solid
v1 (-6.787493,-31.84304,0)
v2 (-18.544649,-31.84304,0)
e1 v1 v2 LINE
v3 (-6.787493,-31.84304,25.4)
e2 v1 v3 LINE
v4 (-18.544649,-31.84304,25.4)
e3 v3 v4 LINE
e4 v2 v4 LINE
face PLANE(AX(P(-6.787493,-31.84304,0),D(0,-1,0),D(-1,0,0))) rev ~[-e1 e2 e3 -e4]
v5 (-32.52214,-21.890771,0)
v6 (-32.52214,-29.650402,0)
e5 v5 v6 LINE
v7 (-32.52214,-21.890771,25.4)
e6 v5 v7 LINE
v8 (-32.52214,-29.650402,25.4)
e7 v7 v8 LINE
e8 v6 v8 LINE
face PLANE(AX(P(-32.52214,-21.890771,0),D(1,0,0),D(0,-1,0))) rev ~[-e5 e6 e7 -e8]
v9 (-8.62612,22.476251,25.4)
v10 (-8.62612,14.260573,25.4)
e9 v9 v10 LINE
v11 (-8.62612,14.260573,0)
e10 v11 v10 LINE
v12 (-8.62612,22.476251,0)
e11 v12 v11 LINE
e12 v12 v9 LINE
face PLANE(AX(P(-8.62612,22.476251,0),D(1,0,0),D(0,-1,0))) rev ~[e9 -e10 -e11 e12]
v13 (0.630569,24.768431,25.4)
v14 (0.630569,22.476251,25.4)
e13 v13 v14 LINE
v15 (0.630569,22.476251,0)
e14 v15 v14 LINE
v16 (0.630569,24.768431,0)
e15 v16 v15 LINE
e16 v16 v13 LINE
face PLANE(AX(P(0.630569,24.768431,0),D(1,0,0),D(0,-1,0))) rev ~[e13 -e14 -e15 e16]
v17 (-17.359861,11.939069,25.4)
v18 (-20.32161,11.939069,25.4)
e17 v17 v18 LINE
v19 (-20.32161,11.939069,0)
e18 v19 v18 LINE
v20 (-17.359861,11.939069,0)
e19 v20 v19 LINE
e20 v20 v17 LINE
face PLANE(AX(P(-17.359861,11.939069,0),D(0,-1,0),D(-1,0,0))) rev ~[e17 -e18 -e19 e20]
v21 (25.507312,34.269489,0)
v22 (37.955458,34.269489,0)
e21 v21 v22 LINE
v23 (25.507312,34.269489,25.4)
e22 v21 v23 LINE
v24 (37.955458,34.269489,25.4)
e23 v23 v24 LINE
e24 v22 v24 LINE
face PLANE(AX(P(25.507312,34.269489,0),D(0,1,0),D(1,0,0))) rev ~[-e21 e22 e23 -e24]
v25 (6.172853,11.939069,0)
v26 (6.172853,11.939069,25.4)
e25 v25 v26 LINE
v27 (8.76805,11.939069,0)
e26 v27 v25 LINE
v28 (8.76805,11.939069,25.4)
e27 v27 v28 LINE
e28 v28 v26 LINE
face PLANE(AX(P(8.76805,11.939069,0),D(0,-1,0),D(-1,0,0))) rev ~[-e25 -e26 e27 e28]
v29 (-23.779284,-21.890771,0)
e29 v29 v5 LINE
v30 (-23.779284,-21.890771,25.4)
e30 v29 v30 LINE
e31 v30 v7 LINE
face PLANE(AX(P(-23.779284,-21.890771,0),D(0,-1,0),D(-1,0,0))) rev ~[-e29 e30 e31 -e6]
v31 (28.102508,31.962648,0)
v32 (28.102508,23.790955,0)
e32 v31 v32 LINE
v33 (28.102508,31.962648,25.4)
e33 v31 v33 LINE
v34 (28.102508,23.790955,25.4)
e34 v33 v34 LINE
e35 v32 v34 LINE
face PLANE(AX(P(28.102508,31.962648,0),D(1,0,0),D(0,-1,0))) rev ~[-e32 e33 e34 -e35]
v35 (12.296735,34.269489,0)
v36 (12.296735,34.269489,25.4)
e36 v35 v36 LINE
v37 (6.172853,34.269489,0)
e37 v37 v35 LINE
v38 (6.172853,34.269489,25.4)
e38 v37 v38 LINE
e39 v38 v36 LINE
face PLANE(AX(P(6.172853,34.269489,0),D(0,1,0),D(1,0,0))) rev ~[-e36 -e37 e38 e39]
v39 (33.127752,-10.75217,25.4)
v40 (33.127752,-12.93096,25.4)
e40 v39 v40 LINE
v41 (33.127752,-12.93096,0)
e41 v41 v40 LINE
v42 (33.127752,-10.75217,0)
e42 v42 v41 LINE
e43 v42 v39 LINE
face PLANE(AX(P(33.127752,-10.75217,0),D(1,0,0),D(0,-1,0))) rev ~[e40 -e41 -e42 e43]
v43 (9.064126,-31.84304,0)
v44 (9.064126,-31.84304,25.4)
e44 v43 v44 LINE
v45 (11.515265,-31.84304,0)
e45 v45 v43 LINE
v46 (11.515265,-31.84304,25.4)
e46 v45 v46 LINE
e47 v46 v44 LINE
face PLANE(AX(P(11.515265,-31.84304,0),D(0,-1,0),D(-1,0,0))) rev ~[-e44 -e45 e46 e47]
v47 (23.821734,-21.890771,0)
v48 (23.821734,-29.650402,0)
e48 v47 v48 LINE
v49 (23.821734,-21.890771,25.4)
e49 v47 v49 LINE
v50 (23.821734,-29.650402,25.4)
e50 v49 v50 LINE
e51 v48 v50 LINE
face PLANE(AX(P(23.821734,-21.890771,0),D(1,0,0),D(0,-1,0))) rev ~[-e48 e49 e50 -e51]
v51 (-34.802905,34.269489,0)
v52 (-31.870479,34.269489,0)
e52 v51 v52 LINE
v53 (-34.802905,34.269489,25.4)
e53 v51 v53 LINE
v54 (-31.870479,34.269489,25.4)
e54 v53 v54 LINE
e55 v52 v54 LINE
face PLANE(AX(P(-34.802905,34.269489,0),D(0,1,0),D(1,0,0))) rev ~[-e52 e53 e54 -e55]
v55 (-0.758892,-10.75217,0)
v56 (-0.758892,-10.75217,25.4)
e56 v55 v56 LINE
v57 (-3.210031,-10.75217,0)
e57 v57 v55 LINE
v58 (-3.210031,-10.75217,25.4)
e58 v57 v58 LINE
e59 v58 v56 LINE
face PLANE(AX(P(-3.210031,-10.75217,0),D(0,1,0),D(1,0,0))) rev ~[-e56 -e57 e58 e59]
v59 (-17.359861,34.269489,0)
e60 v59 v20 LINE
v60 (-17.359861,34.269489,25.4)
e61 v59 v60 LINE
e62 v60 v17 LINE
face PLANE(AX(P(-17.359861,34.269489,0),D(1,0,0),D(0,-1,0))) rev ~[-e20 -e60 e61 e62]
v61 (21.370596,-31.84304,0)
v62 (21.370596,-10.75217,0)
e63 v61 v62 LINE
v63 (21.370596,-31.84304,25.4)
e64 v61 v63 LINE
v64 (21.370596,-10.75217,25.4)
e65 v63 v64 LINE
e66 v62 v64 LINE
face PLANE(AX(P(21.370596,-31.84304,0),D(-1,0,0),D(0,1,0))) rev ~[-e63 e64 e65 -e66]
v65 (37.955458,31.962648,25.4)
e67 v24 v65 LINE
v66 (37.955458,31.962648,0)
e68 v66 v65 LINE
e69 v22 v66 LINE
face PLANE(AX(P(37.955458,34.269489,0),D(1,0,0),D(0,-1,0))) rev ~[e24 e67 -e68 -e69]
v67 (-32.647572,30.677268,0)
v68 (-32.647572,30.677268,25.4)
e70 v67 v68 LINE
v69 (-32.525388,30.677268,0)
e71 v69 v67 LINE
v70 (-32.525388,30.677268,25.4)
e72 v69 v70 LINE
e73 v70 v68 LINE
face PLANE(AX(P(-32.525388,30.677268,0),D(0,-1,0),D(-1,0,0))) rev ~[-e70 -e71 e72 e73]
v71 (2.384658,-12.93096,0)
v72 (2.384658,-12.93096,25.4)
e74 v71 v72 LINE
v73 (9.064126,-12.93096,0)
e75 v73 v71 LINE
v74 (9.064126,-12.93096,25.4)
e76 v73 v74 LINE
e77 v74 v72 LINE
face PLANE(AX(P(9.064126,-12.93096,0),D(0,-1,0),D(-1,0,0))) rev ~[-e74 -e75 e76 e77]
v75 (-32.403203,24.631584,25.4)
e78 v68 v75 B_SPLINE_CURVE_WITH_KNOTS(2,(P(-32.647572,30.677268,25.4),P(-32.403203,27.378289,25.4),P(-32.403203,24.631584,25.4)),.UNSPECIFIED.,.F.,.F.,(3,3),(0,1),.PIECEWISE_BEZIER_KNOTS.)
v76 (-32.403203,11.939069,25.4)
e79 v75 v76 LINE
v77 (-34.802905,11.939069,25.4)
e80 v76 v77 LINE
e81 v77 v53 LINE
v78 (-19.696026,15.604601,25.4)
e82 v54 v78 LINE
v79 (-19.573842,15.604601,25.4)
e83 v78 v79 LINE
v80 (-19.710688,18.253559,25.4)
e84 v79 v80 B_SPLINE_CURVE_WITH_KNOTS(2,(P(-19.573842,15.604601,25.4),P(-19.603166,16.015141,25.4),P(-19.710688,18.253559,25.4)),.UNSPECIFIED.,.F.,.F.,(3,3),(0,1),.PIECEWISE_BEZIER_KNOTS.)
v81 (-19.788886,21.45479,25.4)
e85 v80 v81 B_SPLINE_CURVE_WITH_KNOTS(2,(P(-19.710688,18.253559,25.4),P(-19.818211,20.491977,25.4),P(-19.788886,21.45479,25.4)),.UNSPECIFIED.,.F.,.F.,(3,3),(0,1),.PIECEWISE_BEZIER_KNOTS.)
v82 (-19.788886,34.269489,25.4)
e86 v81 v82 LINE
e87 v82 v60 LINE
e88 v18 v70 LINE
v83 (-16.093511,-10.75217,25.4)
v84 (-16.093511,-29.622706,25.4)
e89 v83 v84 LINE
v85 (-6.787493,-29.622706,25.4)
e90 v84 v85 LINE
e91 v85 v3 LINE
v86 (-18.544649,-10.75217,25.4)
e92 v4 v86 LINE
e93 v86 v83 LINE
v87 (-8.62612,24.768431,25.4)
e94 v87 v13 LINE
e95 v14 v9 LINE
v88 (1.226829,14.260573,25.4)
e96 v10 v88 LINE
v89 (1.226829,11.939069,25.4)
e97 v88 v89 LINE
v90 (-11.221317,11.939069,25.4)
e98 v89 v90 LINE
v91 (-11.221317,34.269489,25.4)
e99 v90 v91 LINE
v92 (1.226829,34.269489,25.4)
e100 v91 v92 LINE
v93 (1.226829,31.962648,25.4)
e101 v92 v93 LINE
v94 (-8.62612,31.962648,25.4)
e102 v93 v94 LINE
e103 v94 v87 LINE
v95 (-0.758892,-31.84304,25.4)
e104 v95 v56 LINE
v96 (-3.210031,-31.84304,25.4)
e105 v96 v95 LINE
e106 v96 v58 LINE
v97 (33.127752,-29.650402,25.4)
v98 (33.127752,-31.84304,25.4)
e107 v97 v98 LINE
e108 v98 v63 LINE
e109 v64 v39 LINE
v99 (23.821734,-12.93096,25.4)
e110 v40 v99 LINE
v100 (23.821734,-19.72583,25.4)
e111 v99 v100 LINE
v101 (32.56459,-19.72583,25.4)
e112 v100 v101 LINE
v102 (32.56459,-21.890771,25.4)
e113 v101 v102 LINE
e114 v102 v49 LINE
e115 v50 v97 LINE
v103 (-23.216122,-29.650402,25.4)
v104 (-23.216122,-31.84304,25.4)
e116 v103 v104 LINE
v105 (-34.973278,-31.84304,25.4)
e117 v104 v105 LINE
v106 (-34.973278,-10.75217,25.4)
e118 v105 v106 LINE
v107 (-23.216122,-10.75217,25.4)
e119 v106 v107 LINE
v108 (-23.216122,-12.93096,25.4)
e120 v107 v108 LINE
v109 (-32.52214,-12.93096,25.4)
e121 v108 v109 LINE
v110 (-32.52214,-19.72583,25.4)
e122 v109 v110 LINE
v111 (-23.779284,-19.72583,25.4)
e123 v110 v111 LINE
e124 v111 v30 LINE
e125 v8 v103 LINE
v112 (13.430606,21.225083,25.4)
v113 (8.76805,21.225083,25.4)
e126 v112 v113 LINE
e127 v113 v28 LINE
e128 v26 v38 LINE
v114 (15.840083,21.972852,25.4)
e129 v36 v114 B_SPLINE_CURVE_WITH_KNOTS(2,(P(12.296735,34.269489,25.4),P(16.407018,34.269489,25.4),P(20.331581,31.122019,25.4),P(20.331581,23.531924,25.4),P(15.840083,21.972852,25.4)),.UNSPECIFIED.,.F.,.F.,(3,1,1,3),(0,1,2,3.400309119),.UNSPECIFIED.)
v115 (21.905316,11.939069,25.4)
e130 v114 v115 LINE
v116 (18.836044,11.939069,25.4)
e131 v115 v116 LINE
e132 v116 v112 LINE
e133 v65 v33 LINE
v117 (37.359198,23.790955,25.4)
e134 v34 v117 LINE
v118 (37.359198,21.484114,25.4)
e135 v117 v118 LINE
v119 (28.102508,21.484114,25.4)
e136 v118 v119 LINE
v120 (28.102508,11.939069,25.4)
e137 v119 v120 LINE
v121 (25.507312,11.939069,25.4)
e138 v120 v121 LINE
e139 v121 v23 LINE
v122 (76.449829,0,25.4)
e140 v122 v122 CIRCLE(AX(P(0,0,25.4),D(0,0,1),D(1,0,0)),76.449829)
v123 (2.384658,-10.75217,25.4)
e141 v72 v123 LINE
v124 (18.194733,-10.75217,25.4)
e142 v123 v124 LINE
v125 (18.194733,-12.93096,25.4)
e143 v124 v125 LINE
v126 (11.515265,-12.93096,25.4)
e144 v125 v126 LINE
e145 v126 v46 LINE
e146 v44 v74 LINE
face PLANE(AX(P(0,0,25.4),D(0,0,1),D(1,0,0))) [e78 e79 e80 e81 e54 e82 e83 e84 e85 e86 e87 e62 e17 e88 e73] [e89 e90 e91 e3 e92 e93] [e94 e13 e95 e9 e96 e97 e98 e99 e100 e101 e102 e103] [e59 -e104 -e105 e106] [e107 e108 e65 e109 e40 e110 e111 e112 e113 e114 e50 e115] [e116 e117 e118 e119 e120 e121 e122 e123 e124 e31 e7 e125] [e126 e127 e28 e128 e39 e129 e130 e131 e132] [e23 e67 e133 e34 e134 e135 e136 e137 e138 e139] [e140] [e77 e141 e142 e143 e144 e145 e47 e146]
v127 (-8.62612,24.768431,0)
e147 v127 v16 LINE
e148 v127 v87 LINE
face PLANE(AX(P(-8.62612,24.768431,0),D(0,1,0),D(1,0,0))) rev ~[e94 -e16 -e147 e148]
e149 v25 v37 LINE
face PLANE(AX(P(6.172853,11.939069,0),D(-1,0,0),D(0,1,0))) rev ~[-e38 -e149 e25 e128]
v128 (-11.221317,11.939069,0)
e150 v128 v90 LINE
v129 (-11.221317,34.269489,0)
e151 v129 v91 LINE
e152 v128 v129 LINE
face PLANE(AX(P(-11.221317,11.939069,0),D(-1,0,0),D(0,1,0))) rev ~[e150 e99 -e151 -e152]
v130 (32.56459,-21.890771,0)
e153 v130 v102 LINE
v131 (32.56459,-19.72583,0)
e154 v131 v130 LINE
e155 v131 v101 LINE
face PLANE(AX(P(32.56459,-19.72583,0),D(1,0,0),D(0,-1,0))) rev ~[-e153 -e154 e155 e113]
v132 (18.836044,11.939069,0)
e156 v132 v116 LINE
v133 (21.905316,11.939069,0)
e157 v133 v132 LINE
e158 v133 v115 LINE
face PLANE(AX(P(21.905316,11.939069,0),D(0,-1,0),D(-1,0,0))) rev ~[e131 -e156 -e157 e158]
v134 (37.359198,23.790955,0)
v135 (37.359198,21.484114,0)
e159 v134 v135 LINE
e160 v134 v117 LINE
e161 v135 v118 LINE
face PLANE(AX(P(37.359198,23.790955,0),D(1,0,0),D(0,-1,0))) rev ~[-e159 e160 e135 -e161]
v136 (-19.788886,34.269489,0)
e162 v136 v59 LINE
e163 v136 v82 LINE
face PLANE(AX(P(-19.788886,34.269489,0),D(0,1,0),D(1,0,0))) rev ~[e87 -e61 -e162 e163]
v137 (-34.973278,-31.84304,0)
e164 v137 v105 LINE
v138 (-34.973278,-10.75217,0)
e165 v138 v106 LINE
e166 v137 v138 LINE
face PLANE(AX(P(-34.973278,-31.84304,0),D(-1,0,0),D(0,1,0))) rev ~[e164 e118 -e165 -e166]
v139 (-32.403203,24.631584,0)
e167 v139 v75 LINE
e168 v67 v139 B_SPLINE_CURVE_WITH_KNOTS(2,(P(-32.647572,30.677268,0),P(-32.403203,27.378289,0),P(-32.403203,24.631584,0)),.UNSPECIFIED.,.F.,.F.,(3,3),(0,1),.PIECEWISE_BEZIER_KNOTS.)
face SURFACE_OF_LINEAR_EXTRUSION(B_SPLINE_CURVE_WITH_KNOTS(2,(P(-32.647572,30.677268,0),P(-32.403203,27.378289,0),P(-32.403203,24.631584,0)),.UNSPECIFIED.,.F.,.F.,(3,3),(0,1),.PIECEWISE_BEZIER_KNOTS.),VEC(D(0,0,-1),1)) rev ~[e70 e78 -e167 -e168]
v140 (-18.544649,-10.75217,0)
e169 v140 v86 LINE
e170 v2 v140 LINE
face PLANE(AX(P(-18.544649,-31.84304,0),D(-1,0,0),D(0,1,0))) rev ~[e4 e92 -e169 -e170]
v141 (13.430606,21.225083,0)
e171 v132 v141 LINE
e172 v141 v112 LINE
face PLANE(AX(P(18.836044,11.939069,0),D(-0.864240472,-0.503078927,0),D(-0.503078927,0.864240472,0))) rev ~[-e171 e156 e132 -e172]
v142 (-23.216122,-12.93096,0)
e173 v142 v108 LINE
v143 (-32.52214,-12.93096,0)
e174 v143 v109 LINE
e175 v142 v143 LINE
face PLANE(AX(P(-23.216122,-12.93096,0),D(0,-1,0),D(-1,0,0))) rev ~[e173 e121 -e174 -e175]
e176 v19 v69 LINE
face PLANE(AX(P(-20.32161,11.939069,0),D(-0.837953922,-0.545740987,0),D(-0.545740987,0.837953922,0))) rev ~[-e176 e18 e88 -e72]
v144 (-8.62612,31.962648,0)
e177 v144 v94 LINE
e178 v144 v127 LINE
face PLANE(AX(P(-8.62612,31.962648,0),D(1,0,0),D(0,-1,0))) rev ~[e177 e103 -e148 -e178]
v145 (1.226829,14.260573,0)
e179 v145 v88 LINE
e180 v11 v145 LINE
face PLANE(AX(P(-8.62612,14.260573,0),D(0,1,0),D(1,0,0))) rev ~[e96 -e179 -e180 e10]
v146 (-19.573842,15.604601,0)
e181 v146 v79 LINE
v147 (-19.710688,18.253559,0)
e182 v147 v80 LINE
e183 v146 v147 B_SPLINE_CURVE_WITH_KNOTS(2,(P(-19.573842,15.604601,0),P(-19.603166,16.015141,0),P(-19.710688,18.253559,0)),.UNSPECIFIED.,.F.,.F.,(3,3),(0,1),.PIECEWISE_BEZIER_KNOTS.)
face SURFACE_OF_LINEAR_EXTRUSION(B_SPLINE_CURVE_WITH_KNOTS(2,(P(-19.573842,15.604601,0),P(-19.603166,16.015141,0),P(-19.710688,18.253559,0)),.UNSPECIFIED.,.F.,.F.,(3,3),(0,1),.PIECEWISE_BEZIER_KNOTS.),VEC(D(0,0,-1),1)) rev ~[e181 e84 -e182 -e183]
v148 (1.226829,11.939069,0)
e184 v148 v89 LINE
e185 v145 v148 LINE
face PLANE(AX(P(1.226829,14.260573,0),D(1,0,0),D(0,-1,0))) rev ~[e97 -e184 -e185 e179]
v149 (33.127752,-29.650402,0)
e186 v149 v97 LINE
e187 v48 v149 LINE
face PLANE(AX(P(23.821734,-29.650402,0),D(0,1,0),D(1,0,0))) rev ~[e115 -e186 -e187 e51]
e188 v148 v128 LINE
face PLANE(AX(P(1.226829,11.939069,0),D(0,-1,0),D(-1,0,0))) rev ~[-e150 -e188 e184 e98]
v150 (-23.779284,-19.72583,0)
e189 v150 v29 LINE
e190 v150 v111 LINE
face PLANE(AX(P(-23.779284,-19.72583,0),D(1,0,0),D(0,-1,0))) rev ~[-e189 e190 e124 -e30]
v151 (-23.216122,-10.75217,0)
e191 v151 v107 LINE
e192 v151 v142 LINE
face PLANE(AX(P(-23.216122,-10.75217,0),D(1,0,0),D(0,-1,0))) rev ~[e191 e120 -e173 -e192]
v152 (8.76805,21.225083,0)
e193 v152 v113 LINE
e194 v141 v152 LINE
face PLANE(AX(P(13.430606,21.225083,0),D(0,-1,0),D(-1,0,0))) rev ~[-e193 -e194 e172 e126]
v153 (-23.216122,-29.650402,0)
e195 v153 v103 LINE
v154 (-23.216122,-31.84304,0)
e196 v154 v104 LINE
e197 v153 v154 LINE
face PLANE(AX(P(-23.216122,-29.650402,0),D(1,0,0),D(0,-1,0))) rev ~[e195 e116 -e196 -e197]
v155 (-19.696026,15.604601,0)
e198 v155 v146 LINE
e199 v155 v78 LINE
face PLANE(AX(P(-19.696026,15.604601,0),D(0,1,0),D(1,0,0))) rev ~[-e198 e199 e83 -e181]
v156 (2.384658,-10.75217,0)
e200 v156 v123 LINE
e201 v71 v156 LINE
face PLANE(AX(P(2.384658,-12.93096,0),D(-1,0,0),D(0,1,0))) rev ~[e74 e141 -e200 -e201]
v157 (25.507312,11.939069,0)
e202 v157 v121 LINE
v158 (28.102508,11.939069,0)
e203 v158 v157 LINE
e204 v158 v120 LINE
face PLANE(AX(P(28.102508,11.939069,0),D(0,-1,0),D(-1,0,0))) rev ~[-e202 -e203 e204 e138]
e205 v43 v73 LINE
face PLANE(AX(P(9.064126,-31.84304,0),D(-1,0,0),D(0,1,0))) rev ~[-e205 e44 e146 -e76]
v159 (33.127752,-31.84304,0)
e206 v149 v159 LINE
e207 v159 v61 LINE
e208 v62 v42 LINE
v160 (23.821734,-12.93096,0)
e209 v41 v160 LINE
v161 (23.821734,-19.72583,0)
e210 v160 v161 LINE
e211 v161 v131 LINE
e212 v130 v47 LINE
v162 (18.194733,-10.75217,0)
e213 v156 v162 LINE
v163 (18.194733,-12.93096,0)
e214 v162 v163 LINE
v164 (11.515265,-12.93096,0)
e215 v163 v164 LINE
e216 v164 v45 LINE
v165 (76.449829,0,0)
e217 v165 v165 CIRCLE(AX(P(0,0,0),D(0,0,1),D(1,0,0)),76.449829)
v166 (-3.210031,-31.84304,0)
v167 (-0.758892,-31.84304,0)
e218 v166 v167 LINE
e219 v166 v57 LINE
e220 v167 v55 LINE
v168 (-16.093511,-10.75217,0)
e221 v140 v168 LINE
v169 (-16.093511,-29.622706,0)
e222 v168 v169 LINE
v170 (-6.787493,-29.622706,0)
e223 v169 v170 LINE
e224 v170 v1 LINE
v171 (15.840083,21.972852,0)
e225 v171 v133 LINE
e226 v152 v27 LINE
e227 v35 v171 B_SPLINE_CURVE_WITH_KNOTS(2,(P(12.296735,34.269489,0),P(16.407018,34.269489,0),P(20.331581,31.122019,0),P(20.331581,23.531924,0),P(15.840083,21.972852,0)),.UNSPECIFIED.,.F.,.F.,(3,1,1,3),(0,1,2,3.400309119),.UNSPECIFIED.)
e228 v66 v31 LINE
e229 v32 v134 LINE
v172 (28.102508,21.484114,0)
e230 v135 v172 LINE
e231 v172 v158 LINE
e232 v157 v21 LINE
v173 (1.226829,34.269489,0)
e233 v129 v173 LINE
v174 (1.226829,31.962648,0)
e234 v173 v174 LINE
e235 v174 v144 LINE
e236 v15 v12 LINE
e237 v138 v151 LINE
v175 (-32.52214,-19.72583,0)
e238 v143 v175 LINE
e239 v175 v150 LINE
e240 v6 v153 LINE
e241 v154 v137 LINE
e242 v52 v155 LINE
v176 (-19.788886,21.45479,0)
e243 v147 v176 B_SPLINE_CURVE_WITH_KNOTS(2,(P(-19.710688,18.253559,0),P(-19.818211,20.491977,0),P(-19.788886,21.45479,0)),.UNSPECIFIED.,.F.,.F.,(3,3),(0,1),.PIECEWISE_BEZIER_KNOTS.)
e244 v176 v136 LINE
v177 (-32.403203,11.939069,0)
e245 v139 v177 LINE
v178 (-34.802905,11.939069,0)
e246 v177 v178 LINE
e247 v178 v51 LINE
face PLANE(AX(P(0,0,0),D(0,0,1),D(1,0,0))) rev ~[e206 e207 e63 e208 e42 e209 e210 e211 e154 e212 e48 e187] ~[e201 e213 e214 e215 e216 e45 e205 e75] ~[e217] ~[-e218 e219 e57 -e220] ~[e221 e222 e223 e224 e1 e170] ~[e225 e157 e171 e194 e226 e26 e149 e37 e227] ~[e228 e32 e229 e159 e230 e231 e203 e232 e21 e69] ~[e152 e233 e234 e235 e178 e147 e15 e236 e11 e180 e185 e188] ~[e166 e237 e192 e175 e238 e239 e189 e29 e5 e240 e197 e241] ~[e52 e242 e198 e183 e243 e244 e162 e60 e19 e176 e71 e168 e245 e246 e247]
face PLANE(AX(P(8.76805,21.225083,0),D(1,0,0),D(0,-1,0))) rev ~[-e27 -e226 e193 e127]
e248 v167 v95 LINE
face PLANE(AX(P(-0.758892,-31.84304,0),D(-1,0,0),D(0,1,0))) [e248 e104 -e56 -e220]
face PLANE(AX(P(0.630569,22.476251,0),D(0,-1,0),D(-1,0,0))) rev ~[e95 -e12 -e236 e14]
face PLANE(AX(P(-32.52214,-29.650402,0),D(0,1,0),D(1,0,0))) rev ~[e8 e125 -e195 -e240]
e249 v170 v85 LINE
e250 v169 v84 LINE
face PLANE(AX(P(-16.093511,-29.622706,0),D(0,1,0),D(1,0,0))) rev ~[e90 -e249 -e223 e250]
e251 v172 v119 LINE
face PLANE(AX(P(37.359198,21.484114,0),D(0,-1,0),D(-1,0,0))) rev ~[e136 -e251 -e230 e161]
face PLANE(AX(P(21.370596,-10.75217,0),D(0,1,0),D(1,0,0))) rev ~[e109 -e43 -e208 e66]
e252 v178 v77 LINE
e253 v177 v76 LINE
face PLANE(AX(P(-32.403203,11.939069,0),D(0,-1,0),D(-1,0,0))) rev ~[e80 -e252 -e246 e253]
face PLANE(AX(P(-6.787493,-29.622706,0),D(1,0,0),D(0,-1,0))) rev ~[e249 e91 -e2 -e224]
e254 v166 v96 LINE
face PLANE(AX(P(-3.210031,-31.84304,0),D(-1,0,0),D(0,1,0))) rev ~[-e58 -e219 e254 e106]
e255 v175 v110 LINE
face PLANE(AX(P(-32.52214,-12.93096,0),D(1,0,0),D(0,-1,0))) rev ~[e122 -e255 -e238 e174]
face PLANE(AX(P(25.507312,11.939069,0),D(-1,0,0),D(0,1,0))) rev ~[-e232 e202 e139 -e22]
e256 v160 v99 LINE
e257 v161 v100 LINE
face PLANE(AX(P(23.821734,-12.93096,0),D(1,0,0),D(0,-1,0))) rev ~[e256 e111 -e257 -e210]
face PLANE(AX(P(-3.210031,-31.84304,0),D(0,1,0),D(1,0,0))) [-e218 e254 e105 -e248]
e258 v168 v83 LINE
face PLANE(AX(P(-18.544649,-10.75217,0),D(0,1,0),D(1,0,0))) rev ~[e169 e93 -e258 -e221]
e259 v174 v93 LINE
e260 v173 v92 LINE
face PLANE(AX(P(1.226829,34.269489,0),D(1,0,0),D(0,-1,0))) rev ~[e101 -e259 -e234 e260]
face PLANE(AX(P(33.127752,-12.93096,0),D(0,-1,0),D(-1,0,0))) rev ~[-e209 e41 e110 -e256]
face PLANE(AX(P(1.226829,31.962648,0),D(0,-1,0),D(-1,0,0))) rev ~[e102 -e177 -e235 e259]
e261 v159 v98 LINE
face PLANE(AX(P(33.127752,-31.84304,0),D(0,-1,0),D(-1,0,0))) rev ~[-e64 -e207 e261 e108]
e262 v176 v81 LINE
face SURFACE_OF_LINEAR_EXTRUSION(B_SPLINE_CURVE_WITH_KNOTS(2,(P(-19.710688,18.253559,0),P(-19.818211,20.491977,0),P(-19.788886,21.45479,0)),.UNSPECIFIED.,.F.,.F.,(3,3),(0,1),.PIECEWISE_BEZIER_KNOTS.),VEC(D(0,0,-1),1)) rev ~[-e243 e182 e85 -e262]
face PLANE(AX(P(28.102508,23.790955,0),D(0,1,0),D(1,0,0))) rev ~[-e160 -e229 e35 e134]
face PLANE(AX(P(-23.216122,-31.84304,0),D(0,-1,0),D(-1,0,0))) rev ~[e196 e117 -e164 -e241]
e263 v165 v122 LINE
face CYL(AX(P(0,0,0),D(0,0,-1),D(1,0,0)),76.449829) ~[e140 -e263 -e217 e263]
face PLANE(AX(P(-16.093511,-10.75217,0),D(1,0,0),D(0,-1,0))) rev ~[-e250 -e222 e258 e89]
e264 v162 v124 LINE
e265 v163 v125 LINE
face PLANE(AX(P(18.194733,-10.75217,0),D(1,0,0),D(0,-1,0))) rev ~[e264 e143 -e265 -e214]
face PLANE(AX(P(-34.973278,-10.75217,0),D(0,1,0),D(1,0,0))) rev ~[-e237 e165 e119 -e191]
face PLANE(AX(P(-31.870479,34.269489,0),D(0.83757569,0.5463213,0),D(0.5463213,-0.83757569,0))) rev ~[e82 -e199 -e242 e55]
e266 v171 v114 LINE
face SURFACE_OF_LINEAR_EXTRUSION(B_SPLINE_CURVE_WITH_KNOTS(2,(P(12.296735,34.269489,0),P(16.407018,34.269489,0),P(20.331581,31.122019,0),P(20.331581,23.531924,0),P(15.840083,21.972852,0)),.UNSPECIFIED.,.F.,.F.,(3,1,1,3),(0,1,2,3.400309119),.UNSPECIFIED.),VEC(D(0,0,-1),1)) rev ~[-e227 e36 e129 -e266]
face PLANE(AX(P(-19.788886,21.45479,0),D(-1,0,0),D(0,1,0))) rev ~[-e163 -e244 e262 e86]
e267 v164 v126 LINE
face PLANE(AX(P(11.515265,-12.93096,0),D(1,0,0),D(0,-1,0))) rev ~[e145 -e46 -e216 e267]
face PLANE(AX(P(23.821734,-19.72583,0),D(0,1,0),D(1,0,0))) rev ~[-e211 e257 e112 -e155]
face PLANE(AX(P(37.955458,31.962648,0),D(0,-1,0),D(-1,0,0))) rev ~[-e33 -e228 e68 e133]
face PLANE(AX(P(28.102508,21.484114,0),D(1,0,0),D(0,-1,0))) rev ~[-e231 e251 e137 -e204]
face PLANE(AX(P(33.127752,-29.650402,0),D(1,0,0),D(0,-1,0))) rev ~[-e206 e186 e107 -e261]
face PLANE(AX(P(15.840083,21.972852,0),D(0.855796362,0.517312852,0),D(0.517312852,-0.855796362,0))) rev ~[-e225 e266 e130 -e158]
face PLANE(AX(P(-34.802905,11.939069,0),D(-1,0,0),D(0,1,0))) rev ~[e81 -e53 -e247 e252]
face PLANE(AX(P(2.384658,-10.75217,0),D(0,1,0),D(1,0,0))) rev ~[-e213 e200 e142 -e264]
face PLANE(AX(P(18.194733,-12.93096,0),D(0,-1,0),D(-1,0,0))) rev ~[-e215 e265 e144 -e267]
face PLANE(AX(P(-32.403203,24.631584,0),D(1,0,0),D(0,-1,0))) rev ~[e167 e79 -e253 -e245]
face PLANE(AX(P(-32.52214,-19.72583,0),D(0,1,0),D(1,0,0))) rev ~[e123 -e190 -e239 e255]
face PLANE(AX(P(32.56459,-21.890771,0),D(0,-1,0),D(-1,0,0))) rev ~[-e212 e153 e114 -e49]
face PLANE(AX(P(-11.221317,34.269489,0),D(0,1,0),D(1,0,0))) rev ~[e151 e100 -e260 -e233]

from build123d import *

# Parameters (mm, degrees)
F0_R     = 76.4498287505
F0_W     = 2.4511385491
F0_H     = 21.0908701144
F1_DEPTH = 25.4


# Not quite as in the source:
# - a feature names something its author has since deleted; it is built from what else it names


with BuildPart() as f1:
    # F0 (on Top) → F1 (new body)
    with BuildSketch(Plane.XY):
        Circle(F0_R)
        with BuildLine():
            Line((-18.3724183589, -37.9301533103), (-18.3724183589, -42.5397194922))
            ThreePointArc((-18.3724183589, -42.5397194922), (-20.6772014499, -40.2349364012), (-18.3724183589, -37.9301533103))
        make_face(mode=Mode.SUBTRACT)
        Polygon((-23.2161222044, -29.6504020767), (-23.2161222044, -31.8430401385), (-34.9732782957, -31.8430401385), (-34.9732782957, -10.7521700241), (-23.2161222044, -10.7521700241), (-23.2161222044, -12.9309598455), (-32.5221397466, -12.9309598455), (-32.5221397466, -19.725829797), (-23.7792839802, -19.725829797), (-23.7792839802, -21.890771378), (-32.5221397466, -21.890771378), (-32.5221397466, -29.6504020767), align=None, mode=Mode.SUBTRACT)
        Polygon((-6.7874930214, -31.8430401385), (-18.5446491127, -31.8430401385), (-18.5446491127, -10.7521700241), (-16.0935105636, -10.7521700241), (-16.0935105636, -29.6227055959), (-6.7874930214, -29.6227055959), align=None, mode=Mode.SUBTRACT)
        with Locations((-1.984461646, -21.2976050813)):
            Rectangle(F0_W, F0_H, mode=Mode.SUBTRACT)
        Polygon((11.5152646944, -12.9309598455), (11.5152646944, -31.8430401385), (9.0641261454, -31.8430401385), (9.0641261454, -12.9309598455), (2.3846581971, -12.9309598455), (2.3846581971, -10.7521700241), (18.1947326427, -10.7521700241), (18.1947326427, -12.9309598455), align=None, mode=Mode.SUBTRACT)
        Polygon((33.1277518635, -29.6504020767), (33.1277518635, -31.8430401385), (21.3705957722, -31.8430401385), (21.3705957722, -10.7521700241), (33.1277518635, -10.7521700241), (33.1277518635, -12.9309598455), (23.8217343212, -12.9309598455), (23.8217343212, -19.725829797), (32.5645900876, -19.725829797), (32.5645900876, -21.890771378), (23.8217343212, -21.890771378), (23.8217343212, -29.6504020767), align=None, mode=Mode.SUBTRACT)
        with BuildLine():
            Line((-17.3598606786, 34.2694889666), (-17.3598606786, 11.9390692562))
            Line((-17.3598606786, 11.9390692562), (-20.321610371, 11.9390692562))
            Line((-20.321610371, 11.9390692562), (-32.5253875688, 30.677267805))
            Line((-32.5253875688, 30.677267805), (-32.647571962, 30.677267805))
            add(Edge.make_bspline(
                [(-32.647571962, 30.677267805), (-32.4032031755, 27.3782891873), (-32.4032031755, 24.631584027)],
                knots=[0, 0, 0, 1, 1, 1], degree=2))
            Line((-32.4032031755, 24.631584027), (-32.4032031755, 11.9390692562))
            Line((-32.4032031755, 11.9390692562), (-34.8029046589, 11.9390692562))
            Line((-34.8029046589, 11.9390692562), (-34.8029046589, 34.2694889666))
            Line((-34.8029046589, 34.2694889666), (-31.8704792209, 34.2694889666))
            Line((-31.8704792209, 34.2694889666), (-19.6960262775, 15.6046010537))
            Line((-19.6960262775, 15.6046010537), (-19.5738418843, 15.6046010537))
            add(Edge.make_bspline(
                [(-19.5738418843, 15.6046010537), (-19.6031661386, 16.015140615), (-19.7106884047, 18.2535586993)],
                knots=[0, 0, 0, 1, 1, 1], degree=2))
            add(Edge.make_bspline(
                [(-19.7106884047, 18.2535586993), (-19.8182106708, 20.4919767837), (-19.7888864164, 21.4547898025)],
                knots=[0, 0, 0, 1, 1, 1], degree=2))
            Line((-19.7888864164, 21.4547898025), (-19.7888864164, 34.2694889666))
            Line((-19.7888864164, 34.2694889666), (-17.3598606786, 34.2694889666))
        make_face(mode=Mode.SUBTRACT)
        Polygon((1.2268292226, 14.2605727279), (1.2268292226, 11.9390692562), (-11.2213167617, 11.9390692562), (-11.2213167617, 34.2694889666), (1.2268292226, 34.2694889666), (1.2268292226, 31.962647622), (-8.6261202491, 31.962647622), (-8.6261202491, 24.7684305474), (0.6305693836, 24.7684305474), (0.6305693836, 22.4762513301), (-8.6261202491, 22.4762513301), (-8.6261202491, 14.2605727279), align=None, mode=Mode.SUBTRACT)
        with BuildLine():
            Line((13.4306064204, 21.2250831432), (8.768049974, 21.2250831432))
            Line((8.768049974, 21.2250831432), (8.768049974, 11.9390692562))
            Line((8.768049974, 11.9390692562), (6.1728534614, 11.9390692562))
            Line((6.1728534614, 11.9390692562), (6.1728534614, 34.2694889666))
            Line((6.1728534614, 34.2694889666), (12.2967352511, 34.2694889666))
            add(Edge.make_bspline(
                [(12.2967352511, 34.2694889666), (16.40701824, 34.2694889666), (18.3692995956, 32.6957539815)],
                knots=[0, 0, 0, 1, 1, 1], degree=2))
            add(Edge.make_bspline(
                [(18.3692995956, 32.6957539815), (20.3315809512, 31.1220189964), (20.3315809512, 27.9598868991)],
                knots=[0, 0, 0, 1, 1, 1], degree=2))
            add(Edge.make_bspline(
                [(20.3315809512, 27.9598868991), (20.3315809512, 23.5319244877), (15.8400826553, 21.9728516299)],
                knots=[0, 0, 0, 1, 1, 1], degree=2))
            Line((15.8400826553, 21.9728516299), (21.9053159362, 11.9390692562))
            Line((21.9053159362, 11.9390692562), (18.8360439778, 11.9390692562))
            Line((18.8360439778, 11.9390692562), (13.4306064204, 21.2250831432))
        make_face(mode=Mode.SUBTRACT)
        Polygon((28.1025083619, 21.4841140569), (28.1025083619, 11.9390692562), (25.5073118492, 11.9390692562), (25.5073118492, 34.2694889666), (37.9554578336, 34.2694889666), (37.9554578336, 31.962647622), (28.1025083619, 31.962647622), (28.1025083619, 23.7909554014), (37.3591979945, 23.7909554014), (37.3591979945, 21.4841140569), align=None, mode=Mode.SUBTRACT)
        with BuildLine():
            ThreePointArc((-18.3724183589, -37.9301533103), (-20.6772014499, -40.2349364012), (-18.3724183589, -42.5397194922))
            Line((-18.3724183589, -42.5397194922), (-18.3724183589, -37.9301533103))
        make_face()
    extrude(amount=F1_DEPTH)


solid = f1.part
